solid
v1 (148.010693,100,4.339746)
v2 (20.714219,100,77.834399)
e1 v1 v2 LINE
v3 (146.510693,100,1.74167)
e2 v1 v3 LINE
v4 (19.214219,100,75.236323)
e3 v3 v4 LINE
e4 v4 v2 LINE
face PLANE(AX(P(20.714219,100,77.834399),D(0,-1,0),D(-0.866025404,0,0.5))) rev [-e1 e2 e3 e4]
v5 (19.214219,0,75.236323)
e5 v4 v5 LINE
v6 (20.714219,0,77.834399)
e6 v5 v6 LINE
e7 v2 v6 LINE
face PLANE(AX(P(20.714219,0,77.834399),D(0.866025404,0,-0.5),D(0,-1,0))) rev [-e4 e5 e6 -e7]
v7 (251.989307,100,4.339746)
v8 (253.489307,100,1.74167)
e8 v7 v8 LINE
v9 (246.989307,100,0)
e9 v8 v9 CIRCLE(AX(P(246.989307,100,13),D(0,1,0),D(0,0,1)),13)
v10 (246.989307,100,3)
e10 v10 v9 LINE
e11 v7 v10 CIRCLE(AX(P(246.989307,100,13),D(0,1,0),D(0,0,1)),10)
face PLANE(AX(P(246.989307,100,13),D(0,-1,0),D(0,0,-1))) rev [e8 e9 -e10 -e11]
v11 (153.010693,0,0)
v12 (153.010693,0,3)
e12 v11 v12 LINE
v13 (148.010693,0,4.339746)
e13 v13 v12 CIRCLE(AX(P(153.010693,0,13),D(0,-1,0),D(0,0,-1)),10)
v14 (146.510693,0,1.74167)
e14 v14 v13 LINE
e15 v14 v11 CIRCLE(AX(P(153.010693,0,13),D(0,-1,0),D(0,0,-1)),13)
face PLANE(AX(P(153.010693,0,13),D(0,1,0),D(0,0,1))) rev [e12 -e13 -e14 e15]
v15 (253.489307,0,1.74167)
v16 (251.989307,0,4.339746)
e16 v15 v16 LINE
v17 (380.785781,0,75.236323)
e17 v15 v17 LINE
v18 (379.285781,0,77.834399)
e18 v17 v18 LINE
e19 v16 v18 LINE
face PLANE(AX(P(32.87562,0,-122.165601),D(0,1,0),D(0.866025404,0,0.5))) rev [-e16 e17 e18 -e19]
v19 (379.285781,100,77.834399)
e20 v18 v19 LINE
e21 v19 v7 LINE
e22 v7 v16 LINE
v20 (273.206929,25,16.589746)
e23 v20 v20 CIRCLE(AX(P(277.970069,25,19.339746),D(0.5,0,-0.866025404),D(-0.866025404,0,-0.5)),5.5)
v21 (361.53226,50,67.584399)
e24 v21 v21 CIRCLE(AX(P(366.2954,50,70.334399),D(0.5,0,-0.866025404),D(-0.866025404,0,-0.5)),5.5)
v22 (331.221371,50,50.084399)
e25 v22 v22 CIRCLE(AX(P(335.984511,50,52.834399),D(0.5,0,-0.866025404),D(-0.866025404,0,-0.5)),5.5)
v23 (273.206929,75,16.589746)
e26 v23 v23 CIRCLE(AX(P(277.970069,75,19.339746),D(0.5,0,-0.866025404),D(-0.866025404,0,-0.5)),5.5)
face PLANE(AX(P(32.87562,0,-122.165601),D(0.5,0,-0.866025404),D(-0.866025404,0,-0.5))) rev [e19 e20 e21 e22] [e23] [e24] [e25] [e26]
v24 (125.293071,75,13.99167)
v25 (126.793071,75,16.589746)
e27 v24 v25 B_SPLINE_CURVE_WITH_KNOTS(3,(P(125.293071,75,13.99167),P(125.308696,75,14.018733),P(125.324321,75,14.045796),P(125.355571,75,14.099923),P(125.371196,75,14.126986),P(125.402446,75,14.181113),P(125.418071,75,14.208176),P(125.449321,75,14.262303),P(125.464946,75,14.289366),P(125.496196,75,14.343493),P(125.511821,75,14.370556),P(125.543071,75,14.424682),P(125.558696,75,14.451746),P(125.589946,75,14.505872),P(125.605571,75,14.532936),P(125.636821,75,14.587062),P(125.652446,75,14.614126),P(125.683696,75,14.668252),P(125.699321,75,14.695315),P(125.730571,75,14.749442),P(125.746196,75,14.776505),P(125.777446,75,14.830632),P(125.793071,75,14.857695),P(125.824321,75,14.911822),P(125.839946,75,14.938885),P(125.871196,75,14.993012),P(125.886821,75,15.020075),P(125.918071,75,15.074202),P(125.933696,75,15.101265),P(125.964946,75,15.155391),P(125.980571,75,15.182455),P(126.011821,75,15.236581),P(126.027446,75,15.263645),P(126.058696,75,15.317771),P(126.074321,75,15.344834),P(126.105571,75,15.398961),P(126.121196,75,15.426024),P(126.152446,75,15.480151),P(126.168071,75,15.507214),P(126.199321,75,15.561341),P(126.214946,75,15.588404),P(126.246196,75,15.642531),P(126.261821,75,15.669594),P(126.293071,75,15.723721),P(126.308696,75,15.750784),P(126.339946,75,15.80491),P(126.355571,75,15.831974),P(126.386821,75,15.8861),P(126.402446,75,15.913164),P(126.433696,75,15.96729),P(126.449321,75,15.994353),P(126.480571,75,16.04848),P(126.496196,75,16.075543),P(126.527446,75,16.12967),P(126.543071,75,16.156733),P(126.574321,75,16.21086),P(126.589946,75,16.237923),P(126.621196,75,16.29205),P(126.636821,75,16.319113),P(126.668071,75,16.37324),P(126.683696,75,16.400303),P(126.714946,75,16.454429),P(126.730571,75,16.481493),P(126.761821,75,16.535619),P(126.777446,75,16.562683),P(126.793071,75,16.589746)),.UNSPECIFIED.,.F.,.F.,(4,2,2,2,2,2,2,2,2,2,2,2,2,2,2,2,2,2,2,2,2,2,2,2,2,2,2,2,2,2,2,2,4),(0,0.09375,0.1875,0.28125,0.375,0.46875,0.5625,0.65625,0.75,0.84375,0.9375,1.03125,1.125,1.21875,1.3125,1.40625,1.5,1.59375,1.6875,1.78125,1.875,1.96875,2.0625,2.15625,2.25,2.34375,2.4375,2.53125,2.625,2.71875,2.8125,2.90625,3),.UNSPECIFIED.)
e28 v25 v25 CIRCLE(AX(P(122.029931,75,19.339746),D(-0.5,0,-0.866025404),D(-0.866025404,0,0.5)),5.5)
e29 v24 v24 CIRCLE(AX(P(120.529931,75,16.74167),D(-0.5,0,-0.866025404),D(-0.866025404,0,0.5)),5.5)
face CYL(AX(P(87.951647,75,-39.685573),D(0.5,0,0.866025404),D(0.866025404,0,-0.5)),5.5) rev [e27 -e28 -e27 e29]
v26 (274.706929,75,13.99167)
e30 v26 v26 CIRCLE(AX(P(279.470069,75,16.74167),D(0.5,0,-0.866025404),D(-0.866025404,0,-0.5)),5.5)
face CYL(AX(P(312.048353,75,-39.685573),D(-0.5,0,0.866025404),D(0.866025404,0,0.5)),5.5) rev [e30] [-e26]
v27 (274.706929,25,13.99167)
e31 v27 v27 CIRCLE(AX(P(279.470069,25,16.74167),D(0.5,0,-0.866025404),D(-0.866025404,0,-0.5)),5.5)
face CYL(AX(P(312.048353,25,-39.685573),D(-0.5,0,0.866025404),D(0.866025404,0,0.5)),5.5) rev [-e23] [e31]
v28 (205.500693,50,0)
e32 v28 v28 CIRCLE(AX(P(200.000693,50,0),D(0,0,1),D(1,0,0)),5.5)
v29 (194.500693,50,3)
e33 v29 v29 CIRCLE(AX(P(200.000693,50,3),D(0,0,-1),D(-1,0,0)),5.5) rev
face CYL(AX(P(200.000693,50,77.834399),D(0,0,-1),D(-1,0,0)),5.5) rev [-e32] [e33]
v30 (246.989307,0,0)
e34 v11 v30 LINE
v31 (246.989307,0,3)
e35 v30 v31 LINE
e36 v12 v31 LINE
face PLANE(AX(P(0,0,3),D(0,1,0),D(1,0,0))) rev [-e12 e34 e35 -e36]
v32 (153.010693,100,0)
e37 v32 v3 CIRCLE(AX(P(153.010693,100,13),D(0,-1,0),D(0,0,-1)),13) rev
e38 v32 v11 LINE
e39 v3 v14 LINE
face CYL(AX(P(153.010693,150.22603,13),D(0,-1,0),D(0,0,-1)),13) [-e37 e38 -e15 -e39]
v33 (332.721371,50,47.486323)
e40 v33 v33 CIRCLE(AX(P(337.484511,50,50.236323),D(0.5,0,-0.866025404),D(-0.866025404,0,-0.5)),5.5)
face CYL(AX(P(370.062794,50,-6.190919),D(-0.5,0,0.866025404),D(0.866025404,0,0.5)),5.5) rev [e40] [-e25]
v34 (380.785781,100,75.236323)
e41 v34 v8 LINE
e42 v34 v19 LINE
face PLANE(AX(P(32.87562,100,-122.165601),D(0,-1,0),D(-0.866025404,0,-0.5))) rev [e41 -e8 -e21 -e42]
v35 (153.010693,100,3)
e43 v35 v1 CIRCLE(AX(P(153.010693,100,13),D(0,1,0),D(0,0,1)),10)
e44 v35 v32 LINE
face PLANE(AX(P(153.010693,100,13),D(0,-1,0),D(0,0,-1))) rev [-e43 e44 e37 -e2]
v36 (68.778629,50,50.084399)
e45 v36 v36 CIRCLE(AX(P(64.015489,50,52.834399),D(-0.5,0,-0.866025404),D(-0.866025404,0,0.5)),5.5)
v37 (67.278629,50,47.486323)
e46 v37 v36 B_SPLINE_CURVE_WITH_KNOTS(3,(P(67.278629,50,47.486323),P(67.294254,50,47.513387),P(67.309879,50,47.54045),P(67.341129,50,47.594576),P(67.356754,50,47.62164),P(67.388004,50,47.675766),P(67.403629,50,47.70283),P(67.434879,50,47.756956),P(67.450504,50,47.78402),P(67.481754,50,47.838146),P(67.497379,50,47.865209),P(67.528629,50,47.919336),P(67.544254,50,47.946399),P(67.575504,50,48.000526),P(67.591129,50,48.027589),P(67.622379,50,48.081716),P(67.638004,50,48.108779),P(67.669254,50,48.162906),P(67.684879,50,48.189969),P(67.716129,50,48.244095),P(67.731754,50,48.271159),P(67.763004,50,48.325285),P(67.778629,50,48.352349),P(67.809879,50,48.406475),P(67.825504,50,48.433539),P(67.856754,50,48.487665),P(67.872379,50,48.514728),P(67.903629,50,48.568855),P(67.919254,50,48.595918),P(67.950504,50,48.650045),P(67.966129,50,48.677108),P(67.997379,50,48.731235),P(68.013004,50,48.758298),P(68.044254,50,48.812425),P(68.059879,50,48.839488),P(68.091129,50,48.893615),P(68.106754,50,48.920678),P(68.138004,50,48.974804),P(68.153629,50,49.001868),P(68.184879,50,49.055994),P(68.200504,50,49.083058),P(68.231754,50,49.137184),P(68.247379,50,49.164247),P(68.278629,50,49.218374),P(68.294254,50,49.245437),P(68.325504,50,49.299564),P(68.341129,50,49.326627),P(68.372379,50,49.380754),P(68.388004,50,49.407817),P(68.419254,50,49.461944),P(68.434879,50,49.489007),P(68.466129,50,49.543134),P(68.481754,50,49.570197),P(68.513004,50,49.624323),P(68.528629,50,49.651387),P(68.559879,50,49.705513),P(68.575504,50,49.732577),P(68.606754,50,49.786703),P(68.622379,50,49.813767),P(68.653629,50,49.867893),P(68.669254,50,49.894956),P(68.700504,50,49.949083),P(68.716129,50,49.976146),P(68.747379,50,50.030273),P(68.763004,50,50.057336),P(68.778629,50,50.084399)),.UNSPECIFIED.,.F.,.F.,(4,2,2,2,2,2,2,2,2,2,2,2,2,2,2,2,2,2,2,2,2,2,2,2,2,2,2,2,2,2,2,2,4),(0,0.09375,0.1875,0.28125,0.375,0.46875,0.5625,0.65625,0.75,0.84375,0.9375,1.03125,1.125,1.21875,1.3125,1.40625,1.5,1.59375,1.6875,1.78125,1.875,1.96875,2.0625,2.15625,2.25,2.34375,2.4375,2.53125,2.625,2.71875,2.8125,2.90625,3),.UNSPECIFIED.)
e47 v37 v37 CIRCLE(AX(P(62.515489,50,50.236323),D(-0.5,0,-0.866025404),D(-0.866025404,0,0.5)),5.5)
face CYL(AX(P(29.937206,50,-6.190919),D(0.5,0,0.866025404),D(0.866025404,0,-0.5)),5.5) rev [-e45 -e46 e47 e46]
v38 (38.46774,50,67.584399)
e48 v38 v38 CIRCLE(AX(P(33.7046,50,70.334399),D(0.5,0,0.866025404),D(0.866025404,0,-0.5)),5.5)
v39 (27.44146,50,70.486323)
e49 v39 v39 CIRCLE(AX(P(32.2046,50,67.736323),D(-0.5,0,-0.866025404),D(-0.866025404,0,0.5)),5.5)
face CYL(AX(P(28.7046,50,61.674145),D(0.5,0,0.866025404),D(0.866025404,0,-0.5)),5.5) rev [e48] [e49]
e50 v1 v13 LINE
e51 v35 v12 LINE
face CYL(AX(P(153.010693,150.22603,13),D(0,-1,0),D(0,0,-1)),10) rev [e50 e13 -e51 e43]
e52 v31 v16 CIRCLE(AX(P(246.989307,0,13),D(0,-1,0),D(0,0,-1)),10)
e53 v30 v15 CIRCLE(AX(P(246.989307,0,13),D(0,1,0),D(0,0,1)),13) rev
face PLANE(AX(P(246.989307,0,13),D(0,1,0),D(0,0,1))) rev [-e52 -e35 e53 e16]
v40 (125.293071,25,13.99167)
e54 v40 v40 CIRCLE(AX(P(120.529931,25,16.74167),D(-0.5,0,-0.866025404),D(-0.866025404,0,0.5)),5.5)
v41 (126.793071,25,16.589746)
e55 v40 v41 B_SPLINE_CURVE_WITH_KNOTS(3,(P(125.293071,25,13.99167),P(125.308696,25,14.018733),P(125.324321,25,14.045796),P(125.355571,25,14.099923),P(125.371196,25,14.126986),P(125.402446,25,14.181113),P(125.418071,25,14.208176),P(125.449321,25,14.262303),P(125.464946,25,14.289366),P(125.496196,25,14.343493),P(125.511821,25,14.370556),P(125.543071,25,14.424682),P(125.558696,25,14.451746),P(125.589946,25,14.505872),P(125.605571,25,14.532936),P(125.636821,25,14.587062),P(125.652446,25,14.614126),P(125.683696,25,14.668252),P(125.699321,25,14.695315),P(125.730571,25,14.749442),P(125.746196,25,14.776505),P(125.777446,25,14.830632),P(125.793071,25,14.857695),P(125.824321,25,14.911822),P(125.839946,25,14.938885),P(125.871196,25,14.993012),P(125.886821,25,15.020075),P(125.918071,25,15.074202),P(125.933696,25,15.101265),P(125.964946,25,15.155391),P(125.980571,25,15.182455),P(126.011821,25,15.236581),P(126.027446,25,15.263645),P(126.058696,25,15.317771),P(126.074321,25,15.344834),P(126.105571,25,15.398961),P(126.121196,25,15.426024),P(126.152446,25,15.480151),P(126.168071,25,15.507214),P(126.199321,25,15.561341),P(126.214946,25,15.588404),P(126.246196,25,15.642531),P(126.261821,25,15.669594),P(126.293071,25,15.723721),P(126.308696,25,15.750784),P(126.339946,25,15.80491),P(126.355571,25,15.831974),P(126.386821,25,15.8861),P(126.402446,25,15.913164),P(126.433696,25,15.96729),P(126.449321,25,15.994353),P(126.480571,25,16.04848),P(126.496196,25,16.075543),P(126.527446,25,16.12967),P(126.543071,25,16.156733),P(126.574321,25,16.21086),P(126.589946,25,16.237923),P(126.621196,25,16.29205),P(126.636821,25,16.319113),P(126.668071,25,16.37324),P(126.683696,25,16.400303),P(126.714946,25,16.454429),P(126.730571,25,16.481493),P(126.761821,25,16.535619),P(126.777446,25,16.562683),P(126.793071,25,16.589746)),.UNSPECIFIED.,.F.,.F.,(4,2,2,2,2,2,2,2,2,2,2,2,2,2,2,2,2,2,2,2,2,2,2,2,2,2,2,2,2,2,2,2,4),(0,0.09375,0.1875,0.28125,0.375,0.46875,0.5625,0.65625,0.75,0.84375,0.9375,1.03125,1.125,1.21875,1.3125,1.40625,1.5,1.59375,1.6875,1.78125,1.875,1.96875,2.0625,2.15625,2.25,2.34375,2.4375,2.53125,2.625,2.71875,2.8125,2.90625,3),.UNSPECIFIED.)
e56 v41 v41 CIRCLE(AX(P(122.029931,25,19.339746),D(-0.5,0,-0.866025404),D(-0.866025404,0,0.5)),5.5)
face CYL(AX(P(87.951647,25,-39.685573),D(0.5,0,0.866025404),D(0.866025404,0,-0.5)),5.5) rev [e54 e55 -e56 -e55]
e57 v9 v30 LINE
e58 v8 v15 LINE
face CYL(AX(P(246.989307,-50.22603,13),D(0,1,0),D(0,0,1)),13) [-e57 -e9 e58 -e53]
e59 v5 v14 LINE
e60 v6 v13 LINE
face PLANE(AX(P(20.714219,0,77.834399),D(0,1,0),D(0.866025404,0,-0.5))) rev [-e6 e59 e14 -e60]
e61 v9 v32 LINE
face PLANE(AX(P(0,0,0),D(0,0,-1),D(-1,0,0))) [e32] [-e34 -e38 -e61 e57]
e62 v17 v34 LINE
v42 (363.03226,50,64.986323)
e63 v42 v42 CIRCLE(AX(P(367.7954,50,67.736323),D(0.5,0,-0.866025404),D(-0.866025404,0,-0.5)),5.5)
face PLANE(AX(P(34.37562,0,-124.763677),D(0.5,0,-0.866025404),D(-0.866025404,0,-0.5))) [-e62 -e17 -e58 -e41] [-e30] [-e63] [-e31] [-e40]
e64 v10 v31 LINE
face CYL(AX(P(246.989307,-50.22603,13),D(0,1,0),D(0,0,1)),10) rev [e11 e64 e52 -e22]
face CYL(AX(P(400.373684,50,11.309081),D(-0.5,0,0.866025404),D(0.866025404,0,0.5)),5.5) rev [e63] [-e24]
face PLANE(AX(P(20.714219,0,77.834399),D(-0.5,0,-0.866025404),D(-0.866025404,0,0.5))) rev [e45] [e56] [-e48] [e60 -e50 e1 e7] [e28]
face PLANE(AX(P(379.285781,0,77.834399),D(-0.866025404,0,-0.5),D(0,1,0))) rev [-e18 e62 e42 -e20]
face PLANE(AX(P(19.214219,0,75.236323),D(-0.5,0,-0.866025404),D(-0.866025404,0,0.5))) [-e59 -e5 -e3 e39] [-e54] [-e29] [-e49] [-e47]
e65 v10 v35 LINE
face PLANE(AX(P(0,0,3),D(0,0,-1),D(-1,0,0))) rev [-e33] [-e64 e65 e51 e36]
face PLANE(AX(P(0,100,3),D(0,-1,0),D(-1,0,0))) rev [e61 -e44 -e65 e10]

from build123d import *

# Parameters (mm, degrees)
SZKIC1_W                        = 400
SZKIC1_H                        = 100
DODANIE_WYCI_GNI_CIE1_DEPTH     = 3
SZKIC_ZGI_CIA1_DEPTH            = 100
SZKIC_ZGI_CIA1_2_DEPTH          = 100
WYTNIJ_WYCI_GNI_CIE4_DEPTH      = 401.746800829
WYTNIJ_WYCI_GNI_CIE4_DEPTH_BACK = 401.746800829
SZKIC18_R                       = 5.5
WYTNIJ_WYCI_GNI_CIE5_DEPTH      = 383.009072614
WYTNIJ_WYCI_GNI_CIE5_DEPTH_BACK = 383.009072614
SZKIC19_R                       = 5.5
WYTNIJ_WYCI_GNI_CIE6_DEPTH      = 363.537857428
WYTNIJ_WYCI_GNI_CIE6_DEPTH_BACK = 363.537857428
SZKIC20_R                       = 5.5
SZKIC21_R                       = 5.5
WYTNIJ_WYCI_GNI_CIE7_DEPTH      = 10


# Read off the part's stored shape, not the designer's step: Szkic zgięcia1
with BuildPart() as part:
    # Szkic1 → Dodanie-wyciągnięcie1 (new body)
    with BuildSketch(Plane.XY):
        with Locations((200, 50)):
            Rectangle(SZKIC1_W, SZKIC1_H)
    extrude(amount=DODANIE_WYCI_GNI_CIE1_DEPTH)

    # Szkic zgięcia1 outline → Szkic zgięcia1 (cut)
    with BuildSketch(Plane(origin=(0, 0, 0), x_dir=(1, 0, 0), z_dir=(0, 1, 0))):
        with BuildLine():
            Line((0, -3), (144.331201036, -3))
            Line((144.331201036, -3), (146.51069296, -1.741669751))
            ThreePointArc((146.51069296, -1.741669751), (149.646045374, -0.442964258), (153.01069296, 0))
            Line((153.01069296, 0), (0, 0))
            Line((0, 0), (0, -3))
        make_face()
        with BuildLine():
            Line((253.48930704, -1.741669751), (255.668798964, -3))
            Line((255.668798964, -3), (400, -3))
            Line((400, -3), (400, 0))
            Line((400, 0), (246.98930704, 0))
            ThreePointArc((246.98930704, 0), (250.353954626, -0.442964258), (253.48930704, -1.741669751))
        make_face()
    extrude(amount=SZKIC_ZGI_CIA1_DEPTH, mode=Mode.SUBTRACT)

    # Szkic zgi_cia1 2 outline → Szkic zgi_cia1 2 (add)
    with BuildSketch(Plane(origin=(0, 0, 0), x_dir=(1, 0, 0), z_dir=(0, 1, 0))):
        with BuildLine():
            Line((20.714218978, -77.834399482), (148.01069296, -4.339745962))
            ThreePointArc((148.01069296, -4.339745962), (150.422502509, -3.340741737), (153.01069296, -3))
            Line((153.01069296, -3), (144.331201036, -3))
            Line((144.331201036, -3), (19.214218978, -75.236323271))
            Line((19.214218978, -75.236323271), (20.714218978, -77.834399482))
        make_face()
        with BuildLine():
            Line((255.668798964, -3), (246.98930704, -3))
            ThreePointArc((246.98930704, -3), (249.577497491, -3.340741737), (251.98930704, -4.339745962))
            Line((251.98930704, -4.339745962), (379.285781022, -77.834399482))
            Line((379.285781022, -77.834399482), (380.785781022, -75.236323271))
            Line((380.785781022, -75.236323271), (255.668798964, -3))
        make_face()
    extrude(amount=SZKIC_ZGI_CIA1_2_DEPTH)

    # Szkic18 → Wytnij-wyciągnięcie4 (cut, two sides: drawn at the far end of the back side and taken through both)
    with BuildSketch(Plane.XY.offset(3).offset(-WYTNIJ_WYCI_GNI_CIE4_DEPTH_BACK)):
        with Locations(Location((200.00069296, 49.999999995, 0), (0, 0, 180))):
            Circle(SZKIC18_R)
    extrude(amount=WYTNIJ_WYCI_GNI_CIE4_DEPTH + WYTNIJ_WYCI_GNI_CIE4_DEPTH_BACK, mode=Mode.SUBTRACT)

    # Szkic19 → Wytnij-wyciągnięcie5 (cut, two sides: drawn at the far end of the back side and taken through both)
    with BuildSketch(Plane(origin=(61.118161635, 0, -105.859761218), x_dir=(0.8660254037844382, 0, 0.500000000000001), z_dir=(-0.500000000000001, 0, 0.8660254037844382)).offset(-WYTNIJ_WYCI_GNI_CIE5_DEPTH_BACK)):
        with Locations(Location((250.39901436, 75, 0), (0, 0, 180))):
            Circle(SZKIC19_R)
        with Locations(Location((250.39901436, 25, 0), (0, 0, 180))):
            Circle(SZKIC19_R)
        with Locations(Location((317.3883214, 50, 0), (0, 0, 180))):
            Circle(SZKIC19_R)
        with Locations(Location((352.3883214, 50, 0), (0, 0, 180))):
            Circle(SZKIC19_R)
    extrude(amount=WYTNIJ_WYCI_GNI_CIE5_DEPTH + WYTNIJ_WYCI_GNI_CIE5_DEPTH_BACK, mode=Mode.SUBTRACT)

    # Szkic20 → Wytnij-wyciągnięcie6 (cut, two sides: drawn at the far end of the back side and taken through both)
    with BuildSketch(Plane(origin=(38.881838365, 0, 67.345319539), x_dir=(0.8660254037844382, 0, -0.500000000000001), z_dir=(0.500000000000001, 0, 0.8660254037844382)).offset(-WYTNIJ_WYCI_GNI_CIE6_DEPTH_BACK)):
        with Locations((96.011147154, 75)):
            Circle(SZKIC20_R)
        with Locations((96.011147154, 25)):
            Circle(SZKIC20_R)
        with Locations((29.021840113, 50)):
            Circle(SZKIC20_R)
    extrude(amount=WYTNIJ_WYCI_GNI_CIE6_DEPTH + WYTNIJ_WYCI_GNI_CIE6_DEPTH_BACK, mode=Mode.SUBTRACT)

    # Szkic21 → Wytnij-wyciągnięcie7 (cut)
    with BuildSketch(Plane(origin=(38.881838365, 0, 67.345319539), x_dir=(0.8660254037844382, 0, -0.500000000000001), z_dir=(0.500000000000001, 0, 0.8660254037844382))):
        with Locations((-5.978159887, 50)):
            Circle(SZKIC21_R)
    extrude(amount=-WYTNIJ_WYCI_GNI_CIE7_DEPTH, mode=Mode.SUBTRACT)


solid = part.part
